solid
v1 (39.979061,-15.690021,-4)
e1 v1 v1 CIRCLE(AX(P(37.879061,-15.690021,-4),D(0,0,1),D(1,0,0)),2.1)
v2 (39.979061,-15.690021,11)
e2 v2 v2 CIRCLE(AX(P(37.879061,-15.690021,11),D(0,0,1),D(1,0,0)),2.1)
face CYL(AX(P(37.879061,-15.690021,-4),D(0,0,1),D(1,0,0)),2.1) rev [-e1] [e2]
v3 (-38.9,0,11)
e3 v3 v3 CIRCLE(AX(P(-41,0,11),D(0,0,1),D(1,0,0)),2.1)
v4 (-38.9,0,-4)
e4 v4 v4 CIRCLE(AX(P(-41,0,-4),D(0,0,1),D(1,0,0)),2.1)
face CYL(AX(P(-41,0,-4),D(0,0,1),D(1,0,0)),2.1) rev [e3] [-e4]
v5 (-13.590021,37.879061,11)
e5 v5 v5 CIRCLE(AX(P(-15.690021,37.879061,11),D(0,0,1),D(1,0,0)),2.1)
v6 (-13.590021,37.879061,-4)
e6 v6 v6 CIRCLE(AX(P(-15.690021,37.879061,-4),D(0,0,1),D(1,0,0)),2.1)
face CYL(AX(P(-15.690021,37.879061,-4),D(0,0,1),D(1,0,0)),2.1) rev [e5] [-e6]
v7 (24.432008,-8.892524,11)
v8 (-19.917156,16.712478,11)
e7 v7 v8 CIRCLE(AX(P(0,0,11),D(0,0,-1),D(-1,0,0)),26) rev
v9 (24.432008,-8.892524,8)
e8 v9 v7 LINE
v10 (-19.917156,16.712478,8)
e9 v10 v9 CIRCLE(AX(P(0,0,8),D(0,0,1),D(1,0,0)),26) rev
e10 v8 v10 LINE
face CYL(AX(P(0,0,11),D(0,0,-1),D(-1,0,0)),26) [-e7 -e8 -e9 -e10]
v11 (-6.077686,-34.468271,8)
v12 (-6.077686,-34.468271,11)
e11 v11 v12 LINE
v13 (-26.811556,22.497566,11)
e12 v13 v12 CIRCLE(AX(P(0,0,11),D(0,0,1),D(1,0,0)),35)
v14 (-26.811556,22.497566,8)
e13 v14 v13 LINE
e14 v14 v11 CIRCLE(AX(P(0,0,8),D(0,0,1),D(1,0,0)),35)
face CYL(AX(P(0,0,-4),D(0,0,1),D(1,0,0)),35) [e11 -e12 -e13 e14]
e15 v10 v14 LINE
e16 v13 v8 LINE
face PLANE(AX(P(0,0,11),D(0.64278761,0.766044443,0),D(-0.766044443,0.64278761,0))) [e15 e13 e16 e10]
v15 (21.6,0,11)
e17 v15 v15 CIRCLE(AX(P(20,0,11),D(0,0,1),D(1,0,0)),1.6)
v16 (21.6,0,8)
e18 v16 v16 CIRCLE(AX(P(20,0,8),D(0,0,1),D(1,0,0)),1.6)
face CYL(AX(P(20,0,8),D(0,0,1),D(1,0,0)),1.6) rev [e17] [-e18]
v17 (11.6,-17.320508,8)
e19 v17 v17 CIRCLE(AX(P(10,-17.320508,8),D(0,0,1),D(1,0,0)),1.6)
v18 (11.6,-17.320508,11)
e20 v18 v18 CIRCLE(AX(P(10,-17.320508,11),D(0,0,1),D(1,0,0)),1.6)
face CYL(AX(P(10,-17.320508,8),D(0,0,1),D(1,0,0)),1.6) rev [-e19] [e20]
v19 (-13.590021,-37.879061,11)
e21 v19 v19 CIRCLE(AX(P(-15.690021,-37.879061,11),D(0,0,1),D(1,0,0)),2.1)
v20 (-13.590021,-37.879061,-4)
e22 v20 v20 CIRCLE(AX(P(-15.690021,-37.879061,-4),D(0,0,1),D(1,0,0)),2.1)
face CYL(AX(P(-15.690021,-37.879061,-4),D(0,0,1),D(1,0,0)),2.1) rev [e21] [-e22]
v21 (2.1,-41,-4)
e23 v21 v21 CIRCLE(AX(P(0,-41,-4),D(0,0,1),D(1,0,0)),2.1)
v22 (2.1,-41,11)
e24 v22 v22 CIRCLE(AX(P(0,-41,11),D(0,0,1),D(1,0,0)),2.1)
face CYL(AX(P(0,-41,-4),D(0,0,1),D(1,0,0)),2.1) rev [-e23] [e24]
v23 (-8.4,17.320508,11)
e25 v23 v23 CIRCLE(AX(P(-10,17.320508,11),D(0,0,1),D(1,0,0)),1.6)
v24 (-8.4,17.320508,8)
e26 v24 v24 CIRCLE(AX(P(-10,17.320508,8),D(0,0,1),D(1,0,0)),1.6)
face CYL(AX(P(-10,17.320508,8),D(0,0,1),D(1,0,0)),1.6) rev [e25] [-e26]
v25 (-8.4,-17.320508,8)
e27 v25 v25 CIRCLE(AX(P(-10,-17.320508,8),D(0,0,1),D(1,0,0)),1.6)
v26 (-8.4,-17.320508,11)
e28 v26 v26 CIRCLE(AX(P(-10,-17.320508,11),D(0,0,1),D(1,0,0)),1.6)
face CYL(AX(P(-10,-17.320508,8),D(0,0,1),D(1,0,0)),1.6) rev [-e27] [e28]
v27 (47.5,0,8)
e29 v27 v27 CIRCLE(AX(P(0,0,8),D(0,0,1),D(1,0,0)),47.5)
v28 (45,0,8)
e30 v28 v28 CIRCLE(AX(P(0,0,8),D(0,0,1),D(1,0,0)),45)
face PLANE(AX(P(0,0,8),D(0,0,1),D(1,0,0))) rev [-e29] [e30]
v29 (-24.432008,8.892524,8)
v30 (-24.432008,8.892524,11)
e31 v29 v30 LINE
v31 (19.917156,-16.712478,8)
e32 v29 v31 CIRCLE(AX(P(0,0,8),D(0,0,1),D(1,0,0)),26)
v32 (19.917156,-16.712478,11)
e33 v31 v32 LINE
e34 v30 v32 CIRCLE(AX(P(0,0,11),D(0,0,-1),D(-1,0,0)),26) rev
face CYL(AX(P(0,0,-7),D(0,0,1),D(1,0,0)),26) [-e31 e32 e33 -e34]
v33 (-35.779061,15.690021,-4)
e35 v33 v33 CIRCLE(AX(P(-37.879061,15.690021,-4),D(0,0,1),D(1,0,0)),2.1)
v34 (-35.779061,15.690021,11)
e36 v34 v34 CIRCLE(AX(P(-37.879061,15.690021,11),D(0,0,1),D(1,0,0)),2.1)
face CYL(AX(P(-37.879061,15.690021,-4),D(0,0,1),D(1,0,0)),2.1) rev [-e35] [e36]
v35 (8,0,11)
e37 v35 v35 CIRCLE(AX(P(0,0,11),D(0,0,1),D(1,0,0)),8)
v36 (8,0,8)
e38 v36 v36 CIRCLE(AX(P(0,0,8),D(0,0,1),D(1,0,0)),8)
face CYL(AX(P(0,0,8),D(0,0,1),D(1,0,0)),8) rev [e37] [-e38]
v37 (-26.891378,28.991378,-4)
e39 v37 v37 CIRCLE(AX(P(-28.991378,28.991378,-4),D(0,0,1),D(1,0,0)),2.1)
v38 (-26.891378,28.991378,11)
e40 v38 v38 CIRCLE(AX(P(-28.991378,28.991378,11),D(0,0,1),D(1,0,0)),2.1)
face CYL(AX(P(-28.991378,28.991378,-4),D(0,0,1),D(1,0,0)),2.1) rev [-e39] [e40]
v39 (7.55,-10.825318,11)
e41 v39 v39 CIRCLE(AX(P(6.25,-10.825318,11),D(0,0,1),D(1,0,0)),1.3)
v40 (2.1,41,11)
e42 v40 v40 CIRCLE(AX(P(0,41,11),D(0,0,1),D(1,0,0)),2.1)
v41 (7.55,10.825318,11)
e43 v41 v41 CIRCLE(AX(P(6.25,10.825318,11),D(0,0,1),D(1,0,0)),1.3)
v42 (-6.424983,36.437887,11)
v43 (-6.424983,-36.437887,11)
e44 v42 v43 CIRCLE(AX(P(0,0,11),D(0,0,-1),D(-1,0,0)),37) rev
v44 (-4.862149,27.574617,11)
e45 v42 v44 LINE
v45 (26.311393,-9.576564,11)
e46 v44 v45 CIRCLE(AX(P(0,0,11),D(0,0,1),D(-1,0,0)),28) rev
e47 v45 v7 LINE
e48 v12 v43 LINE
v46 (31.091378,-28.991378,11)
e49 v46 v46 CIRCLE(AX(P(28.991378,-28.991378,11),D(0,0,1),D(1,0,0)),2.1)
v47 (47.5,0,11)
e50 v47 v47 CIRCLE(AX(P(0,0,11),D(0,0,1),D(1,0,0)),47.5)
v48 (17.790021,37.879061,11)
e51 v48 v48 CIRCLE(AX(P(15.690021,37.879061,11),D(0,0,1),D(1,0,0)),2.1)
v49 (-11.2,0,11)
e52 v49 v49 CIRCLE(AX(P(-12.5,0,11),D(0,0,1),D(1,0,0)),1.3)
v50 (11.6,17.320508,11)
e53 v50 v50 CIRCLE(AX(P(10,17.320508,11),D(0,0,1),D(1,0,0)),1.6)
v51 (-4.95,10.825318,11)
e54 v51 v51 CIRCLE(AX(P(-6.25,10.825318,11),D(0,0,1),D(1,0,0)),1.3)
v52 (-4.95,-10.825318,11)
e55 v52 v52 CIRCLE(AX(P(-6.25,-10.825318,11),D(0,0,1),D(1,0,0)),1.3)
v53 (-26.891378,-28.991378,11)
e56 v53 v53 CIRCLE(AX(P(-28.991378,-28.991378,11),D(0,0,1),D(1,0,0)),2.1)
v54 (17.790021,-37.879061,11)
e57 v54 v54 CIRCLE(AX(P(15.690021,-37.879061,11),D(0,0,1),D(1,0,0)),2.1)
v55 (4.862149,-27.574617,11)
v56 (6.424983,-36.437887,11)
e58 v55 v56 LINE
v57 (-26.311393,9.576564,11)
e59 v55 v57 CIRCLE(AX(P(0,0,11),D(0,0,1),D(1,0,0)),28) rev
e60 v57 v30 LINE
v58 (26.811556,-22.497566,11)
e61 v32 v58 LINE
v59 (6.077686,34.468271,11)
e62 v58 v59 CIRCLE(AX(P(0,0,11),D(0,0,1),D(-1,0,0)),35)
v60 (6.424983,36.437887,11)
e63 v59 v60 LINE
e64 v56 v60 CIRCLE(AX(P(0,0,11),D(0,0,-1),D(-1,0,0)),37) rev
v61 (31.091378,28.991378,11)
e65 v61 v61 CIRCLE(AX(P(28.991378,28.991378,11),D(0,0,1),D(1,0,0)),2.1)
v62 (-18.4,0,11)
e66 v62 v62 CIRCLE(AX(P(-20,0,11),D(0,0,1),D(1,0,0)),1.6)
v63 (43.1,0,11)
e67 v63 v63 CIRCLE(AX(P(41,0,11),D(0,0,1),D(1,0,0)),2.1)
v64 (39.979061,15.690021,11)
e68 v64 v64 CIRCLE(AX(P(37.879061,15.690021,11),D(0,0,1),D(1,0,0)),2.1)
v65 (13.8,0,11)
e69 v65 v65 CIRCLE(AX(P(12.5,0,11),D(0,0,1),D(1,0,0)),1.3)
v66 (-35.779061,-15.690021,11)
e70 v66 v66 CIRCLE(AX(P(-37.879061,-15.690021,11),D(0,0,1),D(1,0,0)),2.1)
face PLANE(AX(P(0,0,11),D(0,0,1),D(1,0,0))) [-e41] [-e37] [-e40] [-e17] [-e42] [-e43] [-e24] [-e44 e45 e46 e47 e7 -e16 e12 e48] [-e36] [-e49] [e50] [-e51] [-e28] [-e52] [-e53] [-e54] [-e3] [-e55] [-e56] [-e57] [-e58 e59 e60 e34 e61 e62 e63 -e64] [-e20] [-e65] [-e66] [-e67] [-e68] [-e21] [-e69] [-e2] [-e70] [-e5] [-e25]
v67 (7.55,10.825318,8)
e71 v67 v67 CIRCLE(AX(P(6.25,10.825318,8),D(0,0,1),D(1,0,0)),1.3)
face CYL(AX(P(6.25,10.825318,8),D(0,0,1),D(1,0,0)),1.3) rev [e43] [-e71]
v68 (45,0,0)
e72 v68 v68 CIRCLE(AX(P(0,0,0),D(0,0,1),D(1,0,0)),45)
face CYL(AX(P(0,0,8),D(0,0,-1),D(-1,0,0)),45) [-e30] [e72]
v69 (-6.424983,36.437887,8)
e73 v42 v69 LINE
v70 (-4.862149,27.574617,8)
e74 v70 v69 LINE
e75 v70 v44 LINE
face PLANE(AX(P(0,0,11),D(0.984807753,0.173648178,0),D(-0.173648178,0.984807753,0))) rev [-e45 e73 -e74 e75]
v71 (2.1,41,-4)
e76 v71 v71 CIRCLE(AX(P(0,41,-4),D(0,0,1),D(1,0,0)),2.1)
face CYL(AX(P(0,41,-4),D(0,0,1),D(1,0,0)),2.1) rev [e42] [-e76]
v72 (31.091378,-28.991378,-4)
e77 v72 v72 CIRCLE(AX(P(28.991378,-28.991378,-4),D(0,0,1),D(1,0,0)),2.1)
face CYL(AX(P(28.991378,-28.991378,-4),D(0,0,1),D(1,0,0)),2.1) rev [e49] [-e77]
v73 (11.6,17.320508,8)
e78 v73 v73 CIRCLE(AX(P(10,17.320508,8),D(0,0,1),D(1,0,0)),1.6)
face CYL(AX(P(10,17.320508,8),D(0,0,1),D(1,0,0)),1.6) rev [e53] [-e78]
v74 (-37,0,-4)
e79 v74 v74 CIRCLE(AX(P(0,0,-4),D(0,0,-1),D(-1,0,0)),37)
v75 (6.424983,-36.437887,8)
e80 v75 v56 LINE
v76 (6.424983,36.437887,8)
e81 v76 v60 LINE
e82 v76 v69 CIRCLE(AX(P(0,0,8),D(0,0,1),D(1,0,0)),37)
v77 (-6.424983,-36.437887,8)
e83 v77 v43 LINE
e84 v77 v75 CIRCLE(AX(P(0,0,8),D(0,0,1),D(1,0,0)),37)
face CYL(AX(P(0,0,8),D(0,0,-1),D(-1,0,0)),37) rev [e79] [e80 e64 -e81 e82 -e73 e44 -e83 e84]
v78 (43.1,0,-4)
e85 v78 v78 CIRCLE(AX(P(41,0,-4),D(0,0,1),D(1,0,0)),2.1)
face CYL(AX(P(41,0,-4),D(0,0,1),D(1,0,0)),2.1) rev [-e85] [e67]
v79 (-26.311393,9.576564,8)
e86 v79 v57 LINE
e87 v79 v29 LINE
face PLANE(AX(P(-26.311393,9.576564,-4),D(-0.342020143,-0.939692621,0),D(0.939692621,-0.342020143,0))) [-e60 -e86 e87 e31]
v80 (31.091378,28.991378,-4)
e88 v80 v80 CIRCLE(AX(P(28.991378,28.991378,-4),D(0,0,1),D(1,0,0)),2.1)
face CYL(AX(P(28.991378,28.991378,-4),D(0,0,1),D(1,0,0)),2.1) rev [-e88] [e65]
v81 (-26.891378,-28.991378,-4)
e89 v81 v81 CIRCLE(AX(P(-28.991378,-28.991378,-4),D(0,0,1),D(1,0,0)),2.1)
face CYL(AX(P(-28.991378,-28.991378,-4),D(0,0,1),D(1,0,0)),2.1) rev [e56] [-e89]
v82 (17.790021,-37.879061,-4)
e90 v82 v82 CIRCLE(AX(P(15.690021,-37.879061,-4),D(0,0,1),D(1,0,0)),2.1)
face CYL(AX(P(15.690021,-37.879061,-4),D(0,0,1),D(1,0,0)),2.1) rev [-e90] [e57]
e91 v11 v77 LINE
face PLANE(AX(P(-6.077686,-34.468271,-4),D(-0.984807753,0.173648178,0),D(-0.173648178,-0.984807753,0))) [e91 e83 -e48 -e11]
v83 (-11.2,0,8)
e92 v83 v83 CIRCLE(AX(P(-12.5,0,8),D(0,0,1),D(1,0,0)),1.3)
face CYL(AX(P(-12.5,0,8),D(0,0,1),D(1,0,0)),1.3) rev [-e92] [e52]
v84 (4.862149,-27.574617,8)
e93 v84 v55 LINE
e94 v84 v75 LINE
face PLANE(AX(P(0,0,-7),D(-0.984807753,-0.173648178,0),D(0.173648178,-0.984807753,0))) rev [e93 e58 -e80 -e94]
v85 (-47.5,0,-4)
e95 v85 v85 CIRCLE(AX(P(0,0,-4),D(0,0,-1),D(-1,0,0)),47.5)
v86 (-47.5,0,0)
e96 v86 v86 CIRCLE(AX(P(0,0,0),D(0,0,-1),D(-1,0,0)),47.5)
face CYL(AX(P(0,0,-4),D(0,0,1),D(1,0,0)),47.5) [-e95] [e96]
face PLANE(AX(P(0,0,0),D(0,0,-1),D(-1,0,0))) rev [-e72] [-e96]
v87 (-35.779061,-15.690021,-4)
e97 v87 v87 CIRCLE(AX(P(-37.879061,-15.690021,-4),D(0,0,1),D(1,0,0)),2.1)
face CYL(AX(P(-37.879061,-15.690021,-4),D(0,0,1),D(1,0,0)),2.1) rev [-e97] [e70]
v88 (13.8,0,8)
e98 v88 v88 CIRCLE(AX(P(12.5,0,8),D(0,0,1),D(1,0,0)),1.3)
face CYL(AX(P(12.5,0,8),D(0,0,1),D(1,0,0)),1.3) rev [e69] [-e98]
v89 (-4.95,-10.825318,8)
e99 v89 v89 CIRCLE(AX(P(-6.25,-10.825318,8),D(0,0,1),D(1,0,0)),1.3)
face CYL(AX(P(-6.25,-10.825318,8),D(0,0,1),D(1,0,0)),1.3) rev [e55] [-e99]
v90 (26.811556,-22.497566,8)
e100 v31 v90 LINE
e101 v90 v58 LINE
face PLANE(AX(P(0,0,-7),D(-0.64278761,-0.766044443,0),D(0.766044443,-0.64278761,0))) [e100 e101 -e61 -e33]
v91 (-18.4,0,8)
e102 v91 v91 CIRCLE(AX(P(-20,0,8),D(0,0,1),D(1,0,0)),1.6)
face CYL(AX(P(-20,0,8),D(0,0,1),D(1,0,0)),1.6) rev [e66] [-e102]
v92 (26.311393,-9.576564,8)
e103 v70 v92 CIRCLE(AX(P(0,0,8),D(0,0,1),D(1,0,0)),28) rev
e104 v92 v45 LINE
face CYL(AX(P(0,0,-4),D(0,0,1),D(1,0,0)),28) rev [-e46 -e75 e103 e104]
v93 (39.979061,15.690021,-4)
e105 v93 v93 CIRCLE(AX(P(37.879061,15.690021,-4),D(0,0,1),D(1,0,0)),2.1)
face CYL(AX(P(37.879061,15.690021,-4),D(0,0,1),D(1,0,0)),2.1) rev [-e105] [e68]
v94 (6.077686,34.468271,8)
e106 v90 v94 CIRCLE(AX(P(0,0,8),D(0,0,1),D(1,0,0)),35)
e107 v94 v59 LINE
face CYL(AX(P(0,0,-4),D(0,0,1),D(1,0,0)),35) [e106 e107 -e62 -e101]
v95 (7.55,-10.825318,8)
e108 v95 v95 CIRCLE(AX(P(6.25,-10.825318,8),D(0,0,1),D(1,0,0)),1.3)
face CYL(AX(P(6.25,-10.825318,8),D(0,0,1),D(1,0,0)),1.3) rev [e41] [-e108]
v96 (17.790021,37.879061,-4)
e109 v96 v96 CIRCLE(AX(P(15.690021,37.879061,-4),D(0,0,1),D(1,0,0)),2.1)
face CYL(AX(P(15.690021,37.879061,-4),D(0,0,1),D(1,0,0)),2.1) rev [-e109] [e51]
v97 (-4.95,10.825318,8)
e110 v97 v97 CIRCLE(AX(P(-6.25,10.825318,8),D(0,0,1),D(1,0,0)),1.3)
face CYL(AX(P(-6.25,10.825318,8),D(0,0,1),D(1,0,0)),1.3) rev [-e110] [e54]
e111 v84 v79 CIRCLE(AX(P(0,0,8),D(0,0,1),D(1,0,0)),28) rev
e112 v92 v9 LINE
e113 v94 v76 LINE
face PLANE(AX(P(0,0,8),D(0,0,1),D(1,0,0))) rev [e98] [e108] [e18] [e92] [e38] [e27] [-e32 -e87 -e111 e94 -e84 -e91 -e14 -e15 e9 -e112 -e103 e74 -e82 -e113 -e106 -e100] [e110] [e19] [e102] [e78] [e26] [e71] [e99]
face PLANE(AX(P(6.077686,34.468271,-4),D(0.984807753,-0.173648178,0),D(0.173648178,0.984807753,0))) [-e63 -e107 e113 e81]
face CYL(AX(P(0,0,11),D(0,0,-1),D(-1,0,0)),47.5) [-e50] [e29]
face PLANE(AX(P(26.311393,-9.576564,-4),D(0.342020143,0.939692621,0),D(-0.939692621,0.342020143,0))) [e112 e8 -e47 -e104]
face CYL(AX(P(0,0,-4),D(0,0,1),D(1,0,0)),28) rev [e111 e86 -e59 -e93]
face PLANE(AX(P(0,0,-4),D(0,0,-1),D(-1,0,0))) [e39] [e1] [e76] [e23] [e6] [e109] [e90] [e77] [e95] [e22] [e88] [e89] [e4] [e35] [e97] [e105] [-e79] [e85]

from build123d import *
from build123d.topology import SkipClean

# Parameters (mm, degrees)
SKETCH_1_R               = 45
SKETCH_1_R_2             = 37
EXTRUDE_1_DEPTH          = 8
EXTRUDE_START            = 4
SKETCH_2_R               = 47.5
SKETCH_2_R_2             = 37
EXTRUDE_2_DEPTH          = 4
EXTRUDE_START_2          = -8
SKETCH_2_2_R             = 47.5
SKETCH_2_2_R_2           = 37
EXTRUDE_5_DEPTH          = 3
CUT_EXTRUDE_1_DEPTH      = 69.82949949
CUT_EXTRUDE_1_DEPTH_BACK = 69.82949949
SKETCH_3_R               = 2.1
EXTRUDE_START_3          = 8
SKETCH_4_R               = 37
SKETCH_4_R_2             = 8
SKETCH_4_R_3             = 1.6
SKETCH_4_R_4             = 1.3
EXTRUDE_3_DEPTH          = 3
CUT_EXTRUDE_START        = 12
CUT_EXTRUDE_3_DEPTH      = 3
CUT_EXTRUDE_4_DEPTH      = 69.82949949
PATTERN_START            = 8
PATTERN_CIRCULAR_1_DEPTH = 3


# Read off the part's stored shape, not the designer's step: 切除-拉伸3, 阵列(圆周)1
with BuildPart() as part:
    # 草图1 → 凸台-拉伸1 (new body)
    with BuildSketch(Plane.XY):
        Circle(SKETCH_1_R)
        Circle(SKETCH_1_R_2, mode=Mode.SUBTRACT)
    extrude(amount=EXTRUDE_1_DEPTH)

    # 草图2 → 凸台-拉伸2 (add)
    with SkipClean():  # the faces are left unmerged after this step: merging them gives an invalid solid
        with BuildSketch(Plane(origin=(0, 0, 0), x_dir=(-1, 0, 0), z_dir=(0, 0, -1)).offset(EXTRUDE_START)):
            Circle(SKETCH_2_R)
            Circle(SKETCH_2_R_2, mode=Mode.SUBTRACT)
        extrude(amount=-EXTRUDE_2_DEPTH)

    # 草图2<2> → 凸台-拉伸5 (add)
    with BuildSketch(Plane(origin=(0, 0, 0), x_dir=(-1, 0, 0), z_dir=(0, 0, -1)).offset(EXTRUDE_START_2)):
        Circle(SKETCH_2_2_R)
        Circle(SKETCH_2_2_R_2, mode=Mode.SUBTRACT)
    extrude(amount=-EXTRUDE_5_DEPTH)

    # 草图3 → 切除-拉伸1 (cut, two sides: drawn at the far end of the back side and taken through both)
    with BuildSketch(Plane.XY.offset(11).offset(-CUT_EXTRUDE_1_DEPTH_BACK)):
        with Locations((0, 41)):
            Circle(SKETCH_3_R)
        with Locations((15.690020727, 37.879060833)):
            Circle(SKETCH_3_R)
        with Locations((28.991378029, 28.991378029)):
            Circle(SKETCH_3_R)
        with Locations((37.879060833, 15.690020727)):
            Circle(SKETCH_3_R)
        with Locations((41, 0)):
            Circle(SKETCH_3_R)
        with Locations((37.879060833, -15.690020727)):
            Circle(SKETCH_3_R)
        with Locations((28.991378029, -28.991378029)):
            Circle(SKETCH_3_R)
        with Locations((15.690020727, -37.879060833)):
            Circle(SKETCH_3_R)
        with Locations((0, -41)):
            Circle(SKETCH_3_R)
        with Locations((-15.690020727, -37.879060833)):
            Circle(SKETCH_3_R)
        with Locations((-28.991378029, -28.991378029)):
            Circle(SKETCH_3_R)
        with Locations((-37.879060833, -15.690020727)):
            Circle(SKETCH_3_R)
        with Locations((-41, 0)):
            Circle(SKETCH_3_R)
        with Locations((-37.879060833, 15.690020727)):
            Circle(SKETCH_3_R)
        with Locations((-28.991378029, 28.991378029)):
            Circle(SKETCH_3_R)
        with Locations((-15.690020727, 37.879060833)):
            Circle(SKETCH_3_R)
    extrude(amount=CUT_EXTRUDE_1_DEPTH + CUT_EXTRUDE_1_DEPTH_BACK, mode=Mode.SUBTRACT)

    # 草图4 → 凸台-拉伸3 (add)
    with BuildSketch(Plane.XY.offset(EXTRUDE_START_3)):
        with Locations(Location((0, 0, 0), (0, 0, 180))):
            Circle(SKETCH_4_R)
        Circle(SKETCH_4_R_2, mode=Mode.SUBTRACT)
        with Locations((20, 0)):
            Circle(SKETCH_4_R_3, mode=Mode.SUBTRACT)
        with Locations((10, -17.320508076)):
            Circle(SKETCH_4_R_3, mode=Mode.SUBTRACT)
        with Locations((-10, -17.320508076)):
            Circle(SKETCH_4_R_3, mode=Mode.SUBTRACT)
        with Locations((12.5, 0)):
            Circle(SKETCH_4_R_4, mode=Mode.SUBTRACT)
        with Locations((-20, 0)):
            Circle(SKETCH_4_R_3, mode=Mode.SUBTRACT)
        with Locations((-10, 17.320508076)):
            Circle(SKETCH_4_R_3, mode=Mode.SUBTRACT)
        with Locations((10, 17.320508076)):
            Circle(SKETCH_4_R_3, mode=Mode.SUBTRACT)
        with Locations((6.25, -10.825317547)):
            Circle(SKETCH_4_R_4, mode=Mode.SUBTRACT)
        with Locations((-6.25, -10.825317547)):
            Circle(SKETCH_4_R_4, mode=Mode.SUBTRACT)
        with Locations((-12.5, 0)):
            Circle(SKETCH_4_R_4, mode=Mode.SUBTRACT)
        with Locations((-6.25, 10.825317547)):
            Circle(SKETCH_4_R_4, mode=Mode.SUBTRACT)
        with Locations((6.25, 10.825317547)):
            Circle(SKETCH_4_R_4, mode=Mode.SUBTRACT)
    extrude(amount=EXTRUDE_3_DEPTH)

    # 切除-拉伸3 outline → 切除-拉伸3 (cut)
    with BuildSketch(Plane.XY.offset(-4).offset(CUT_EXTRUDE_START)):
        with BuildLine():
            Line((-4.514852619, 25.605001578), (-6.424982574, 36.437886861))
            ThreePointArc((-6.424982574, 36.437886861), (-18.5, 32.04293994), (-28.343644395, 23.783141558))
            Line((-28.343644395, 23.783141558), (-19.917155521, 16.712477852))
            ThreePointArc((-19.917155521, 16.712477852), (-13, 22.516660498), (-4.514852619, 25.605001578))
        make_face()
        with BuildLine():
            ThreePointArc((6.424982574, -36.437886861), (18.5, -32.04293994), (28.343644395, -23.783141558))
            Line((28.343644395, -23.783141558), (19.917155521, -16.712477852))
            ThreePointArc((19.917155521, -16.712477852), (13, -22.516660498), (4.514852619, -25.605001578))
            Line((4.514852619, -25.605001578), (6.424982574, -36.437886861))
        make_face()
    extrude(amount=CUT_EXTRUDE_3_DEPTH, mode=Mode.SUBTRACT)

    # 草图8 → Cut-Extrude 4 (cut, through all)
    with BuildSketch(Plane.XY.offset(11)):
        with BuildLine():
            ThreePointArc((4.514852619, -25.605001578), (-19.917155521, -16.712477852), (-24.43200814, 8.892523726))
            Line((-24.43200814, 8.892523726), (-26.311393382, 9.576564013))
            ThreePointArc((-26.311393382, 9.576564013), (-21.449244407, -17.998053071), (4.862148975, -27.574617084))
            Line((4.862148975, -27.574617084), (4.514852619, -25.605001578))
        make_face()
        with BuildLine():
            ThreePointArc((-28.343644395, 23.783141558), (-34.768626969, -12.654745303), (-6.424982574, -36.437886861))
            Line((-6.424982574, -36.437886861), (-6.077686218, -34.468271355))
            ThreePointArc((-6.077686218, -34.468271355), (-32.889241728, -11.970705016), (-26.811555509, 22.497566339))
            Line((-26.811555509, 22.497566339), (-28.343644395, 23.783141558))
        make_face()
    extrude(amount=-CUT_EXTRUDE_4_DEPTH, mode=Mode.SUBTRACT)


with BuildPart() as cut_extrude_4_kept_piece:
    # of the separate pieces the step leaves, the one the design keeps (cut_extrude_4_pieces_kept)
    add(part.part.solids().sort_by_distance((45, 0, 8))[0])

    # 阵列(圆周)1 outline → 阵列(圆周)1 (cut)
    with BuildSketch(Plane.XY.offset(PATTERN_START)):
        with BuildLine():
            ThreePointArc((28.343644395, -23.783141558), (34.768626969, 12.654745303), (6.424982574, 36.437886861))
            Line((6.424982574, 36.437886861), (6.077686218, 34.468271355))
            ThreePointArc((6.077686218, 34.468271355), (32.889241728, 11.970705017), (26.811555509, -22.497566339))
            Line((26.811555509, -22.497566339), (28.343644395, -23.783141558))
        make_face()
        with BuildLine():
            ThreePointArc((26.311393382, -9.576564013), (21.449244407, 17.998053071), (-4.862148975, 27.574617084))
            Line((-4.862148975, 27.574617084), (-4.514852619, 25.605001578))
            ThreePointArc((-4.514852619, 25.605001578), (19.917155521, 16.712477852), (24.43200814, -8.892523726))
            Line((24.43200814, -8.892523726), (26.311393382, -9.576564013))
        make_face()
    extrude(amount=PATTERN_CIRCULAR_1_DEPTH, mode=Mode.SUBTRACT)


solid = cut_extrude_4_kept_piece.part
